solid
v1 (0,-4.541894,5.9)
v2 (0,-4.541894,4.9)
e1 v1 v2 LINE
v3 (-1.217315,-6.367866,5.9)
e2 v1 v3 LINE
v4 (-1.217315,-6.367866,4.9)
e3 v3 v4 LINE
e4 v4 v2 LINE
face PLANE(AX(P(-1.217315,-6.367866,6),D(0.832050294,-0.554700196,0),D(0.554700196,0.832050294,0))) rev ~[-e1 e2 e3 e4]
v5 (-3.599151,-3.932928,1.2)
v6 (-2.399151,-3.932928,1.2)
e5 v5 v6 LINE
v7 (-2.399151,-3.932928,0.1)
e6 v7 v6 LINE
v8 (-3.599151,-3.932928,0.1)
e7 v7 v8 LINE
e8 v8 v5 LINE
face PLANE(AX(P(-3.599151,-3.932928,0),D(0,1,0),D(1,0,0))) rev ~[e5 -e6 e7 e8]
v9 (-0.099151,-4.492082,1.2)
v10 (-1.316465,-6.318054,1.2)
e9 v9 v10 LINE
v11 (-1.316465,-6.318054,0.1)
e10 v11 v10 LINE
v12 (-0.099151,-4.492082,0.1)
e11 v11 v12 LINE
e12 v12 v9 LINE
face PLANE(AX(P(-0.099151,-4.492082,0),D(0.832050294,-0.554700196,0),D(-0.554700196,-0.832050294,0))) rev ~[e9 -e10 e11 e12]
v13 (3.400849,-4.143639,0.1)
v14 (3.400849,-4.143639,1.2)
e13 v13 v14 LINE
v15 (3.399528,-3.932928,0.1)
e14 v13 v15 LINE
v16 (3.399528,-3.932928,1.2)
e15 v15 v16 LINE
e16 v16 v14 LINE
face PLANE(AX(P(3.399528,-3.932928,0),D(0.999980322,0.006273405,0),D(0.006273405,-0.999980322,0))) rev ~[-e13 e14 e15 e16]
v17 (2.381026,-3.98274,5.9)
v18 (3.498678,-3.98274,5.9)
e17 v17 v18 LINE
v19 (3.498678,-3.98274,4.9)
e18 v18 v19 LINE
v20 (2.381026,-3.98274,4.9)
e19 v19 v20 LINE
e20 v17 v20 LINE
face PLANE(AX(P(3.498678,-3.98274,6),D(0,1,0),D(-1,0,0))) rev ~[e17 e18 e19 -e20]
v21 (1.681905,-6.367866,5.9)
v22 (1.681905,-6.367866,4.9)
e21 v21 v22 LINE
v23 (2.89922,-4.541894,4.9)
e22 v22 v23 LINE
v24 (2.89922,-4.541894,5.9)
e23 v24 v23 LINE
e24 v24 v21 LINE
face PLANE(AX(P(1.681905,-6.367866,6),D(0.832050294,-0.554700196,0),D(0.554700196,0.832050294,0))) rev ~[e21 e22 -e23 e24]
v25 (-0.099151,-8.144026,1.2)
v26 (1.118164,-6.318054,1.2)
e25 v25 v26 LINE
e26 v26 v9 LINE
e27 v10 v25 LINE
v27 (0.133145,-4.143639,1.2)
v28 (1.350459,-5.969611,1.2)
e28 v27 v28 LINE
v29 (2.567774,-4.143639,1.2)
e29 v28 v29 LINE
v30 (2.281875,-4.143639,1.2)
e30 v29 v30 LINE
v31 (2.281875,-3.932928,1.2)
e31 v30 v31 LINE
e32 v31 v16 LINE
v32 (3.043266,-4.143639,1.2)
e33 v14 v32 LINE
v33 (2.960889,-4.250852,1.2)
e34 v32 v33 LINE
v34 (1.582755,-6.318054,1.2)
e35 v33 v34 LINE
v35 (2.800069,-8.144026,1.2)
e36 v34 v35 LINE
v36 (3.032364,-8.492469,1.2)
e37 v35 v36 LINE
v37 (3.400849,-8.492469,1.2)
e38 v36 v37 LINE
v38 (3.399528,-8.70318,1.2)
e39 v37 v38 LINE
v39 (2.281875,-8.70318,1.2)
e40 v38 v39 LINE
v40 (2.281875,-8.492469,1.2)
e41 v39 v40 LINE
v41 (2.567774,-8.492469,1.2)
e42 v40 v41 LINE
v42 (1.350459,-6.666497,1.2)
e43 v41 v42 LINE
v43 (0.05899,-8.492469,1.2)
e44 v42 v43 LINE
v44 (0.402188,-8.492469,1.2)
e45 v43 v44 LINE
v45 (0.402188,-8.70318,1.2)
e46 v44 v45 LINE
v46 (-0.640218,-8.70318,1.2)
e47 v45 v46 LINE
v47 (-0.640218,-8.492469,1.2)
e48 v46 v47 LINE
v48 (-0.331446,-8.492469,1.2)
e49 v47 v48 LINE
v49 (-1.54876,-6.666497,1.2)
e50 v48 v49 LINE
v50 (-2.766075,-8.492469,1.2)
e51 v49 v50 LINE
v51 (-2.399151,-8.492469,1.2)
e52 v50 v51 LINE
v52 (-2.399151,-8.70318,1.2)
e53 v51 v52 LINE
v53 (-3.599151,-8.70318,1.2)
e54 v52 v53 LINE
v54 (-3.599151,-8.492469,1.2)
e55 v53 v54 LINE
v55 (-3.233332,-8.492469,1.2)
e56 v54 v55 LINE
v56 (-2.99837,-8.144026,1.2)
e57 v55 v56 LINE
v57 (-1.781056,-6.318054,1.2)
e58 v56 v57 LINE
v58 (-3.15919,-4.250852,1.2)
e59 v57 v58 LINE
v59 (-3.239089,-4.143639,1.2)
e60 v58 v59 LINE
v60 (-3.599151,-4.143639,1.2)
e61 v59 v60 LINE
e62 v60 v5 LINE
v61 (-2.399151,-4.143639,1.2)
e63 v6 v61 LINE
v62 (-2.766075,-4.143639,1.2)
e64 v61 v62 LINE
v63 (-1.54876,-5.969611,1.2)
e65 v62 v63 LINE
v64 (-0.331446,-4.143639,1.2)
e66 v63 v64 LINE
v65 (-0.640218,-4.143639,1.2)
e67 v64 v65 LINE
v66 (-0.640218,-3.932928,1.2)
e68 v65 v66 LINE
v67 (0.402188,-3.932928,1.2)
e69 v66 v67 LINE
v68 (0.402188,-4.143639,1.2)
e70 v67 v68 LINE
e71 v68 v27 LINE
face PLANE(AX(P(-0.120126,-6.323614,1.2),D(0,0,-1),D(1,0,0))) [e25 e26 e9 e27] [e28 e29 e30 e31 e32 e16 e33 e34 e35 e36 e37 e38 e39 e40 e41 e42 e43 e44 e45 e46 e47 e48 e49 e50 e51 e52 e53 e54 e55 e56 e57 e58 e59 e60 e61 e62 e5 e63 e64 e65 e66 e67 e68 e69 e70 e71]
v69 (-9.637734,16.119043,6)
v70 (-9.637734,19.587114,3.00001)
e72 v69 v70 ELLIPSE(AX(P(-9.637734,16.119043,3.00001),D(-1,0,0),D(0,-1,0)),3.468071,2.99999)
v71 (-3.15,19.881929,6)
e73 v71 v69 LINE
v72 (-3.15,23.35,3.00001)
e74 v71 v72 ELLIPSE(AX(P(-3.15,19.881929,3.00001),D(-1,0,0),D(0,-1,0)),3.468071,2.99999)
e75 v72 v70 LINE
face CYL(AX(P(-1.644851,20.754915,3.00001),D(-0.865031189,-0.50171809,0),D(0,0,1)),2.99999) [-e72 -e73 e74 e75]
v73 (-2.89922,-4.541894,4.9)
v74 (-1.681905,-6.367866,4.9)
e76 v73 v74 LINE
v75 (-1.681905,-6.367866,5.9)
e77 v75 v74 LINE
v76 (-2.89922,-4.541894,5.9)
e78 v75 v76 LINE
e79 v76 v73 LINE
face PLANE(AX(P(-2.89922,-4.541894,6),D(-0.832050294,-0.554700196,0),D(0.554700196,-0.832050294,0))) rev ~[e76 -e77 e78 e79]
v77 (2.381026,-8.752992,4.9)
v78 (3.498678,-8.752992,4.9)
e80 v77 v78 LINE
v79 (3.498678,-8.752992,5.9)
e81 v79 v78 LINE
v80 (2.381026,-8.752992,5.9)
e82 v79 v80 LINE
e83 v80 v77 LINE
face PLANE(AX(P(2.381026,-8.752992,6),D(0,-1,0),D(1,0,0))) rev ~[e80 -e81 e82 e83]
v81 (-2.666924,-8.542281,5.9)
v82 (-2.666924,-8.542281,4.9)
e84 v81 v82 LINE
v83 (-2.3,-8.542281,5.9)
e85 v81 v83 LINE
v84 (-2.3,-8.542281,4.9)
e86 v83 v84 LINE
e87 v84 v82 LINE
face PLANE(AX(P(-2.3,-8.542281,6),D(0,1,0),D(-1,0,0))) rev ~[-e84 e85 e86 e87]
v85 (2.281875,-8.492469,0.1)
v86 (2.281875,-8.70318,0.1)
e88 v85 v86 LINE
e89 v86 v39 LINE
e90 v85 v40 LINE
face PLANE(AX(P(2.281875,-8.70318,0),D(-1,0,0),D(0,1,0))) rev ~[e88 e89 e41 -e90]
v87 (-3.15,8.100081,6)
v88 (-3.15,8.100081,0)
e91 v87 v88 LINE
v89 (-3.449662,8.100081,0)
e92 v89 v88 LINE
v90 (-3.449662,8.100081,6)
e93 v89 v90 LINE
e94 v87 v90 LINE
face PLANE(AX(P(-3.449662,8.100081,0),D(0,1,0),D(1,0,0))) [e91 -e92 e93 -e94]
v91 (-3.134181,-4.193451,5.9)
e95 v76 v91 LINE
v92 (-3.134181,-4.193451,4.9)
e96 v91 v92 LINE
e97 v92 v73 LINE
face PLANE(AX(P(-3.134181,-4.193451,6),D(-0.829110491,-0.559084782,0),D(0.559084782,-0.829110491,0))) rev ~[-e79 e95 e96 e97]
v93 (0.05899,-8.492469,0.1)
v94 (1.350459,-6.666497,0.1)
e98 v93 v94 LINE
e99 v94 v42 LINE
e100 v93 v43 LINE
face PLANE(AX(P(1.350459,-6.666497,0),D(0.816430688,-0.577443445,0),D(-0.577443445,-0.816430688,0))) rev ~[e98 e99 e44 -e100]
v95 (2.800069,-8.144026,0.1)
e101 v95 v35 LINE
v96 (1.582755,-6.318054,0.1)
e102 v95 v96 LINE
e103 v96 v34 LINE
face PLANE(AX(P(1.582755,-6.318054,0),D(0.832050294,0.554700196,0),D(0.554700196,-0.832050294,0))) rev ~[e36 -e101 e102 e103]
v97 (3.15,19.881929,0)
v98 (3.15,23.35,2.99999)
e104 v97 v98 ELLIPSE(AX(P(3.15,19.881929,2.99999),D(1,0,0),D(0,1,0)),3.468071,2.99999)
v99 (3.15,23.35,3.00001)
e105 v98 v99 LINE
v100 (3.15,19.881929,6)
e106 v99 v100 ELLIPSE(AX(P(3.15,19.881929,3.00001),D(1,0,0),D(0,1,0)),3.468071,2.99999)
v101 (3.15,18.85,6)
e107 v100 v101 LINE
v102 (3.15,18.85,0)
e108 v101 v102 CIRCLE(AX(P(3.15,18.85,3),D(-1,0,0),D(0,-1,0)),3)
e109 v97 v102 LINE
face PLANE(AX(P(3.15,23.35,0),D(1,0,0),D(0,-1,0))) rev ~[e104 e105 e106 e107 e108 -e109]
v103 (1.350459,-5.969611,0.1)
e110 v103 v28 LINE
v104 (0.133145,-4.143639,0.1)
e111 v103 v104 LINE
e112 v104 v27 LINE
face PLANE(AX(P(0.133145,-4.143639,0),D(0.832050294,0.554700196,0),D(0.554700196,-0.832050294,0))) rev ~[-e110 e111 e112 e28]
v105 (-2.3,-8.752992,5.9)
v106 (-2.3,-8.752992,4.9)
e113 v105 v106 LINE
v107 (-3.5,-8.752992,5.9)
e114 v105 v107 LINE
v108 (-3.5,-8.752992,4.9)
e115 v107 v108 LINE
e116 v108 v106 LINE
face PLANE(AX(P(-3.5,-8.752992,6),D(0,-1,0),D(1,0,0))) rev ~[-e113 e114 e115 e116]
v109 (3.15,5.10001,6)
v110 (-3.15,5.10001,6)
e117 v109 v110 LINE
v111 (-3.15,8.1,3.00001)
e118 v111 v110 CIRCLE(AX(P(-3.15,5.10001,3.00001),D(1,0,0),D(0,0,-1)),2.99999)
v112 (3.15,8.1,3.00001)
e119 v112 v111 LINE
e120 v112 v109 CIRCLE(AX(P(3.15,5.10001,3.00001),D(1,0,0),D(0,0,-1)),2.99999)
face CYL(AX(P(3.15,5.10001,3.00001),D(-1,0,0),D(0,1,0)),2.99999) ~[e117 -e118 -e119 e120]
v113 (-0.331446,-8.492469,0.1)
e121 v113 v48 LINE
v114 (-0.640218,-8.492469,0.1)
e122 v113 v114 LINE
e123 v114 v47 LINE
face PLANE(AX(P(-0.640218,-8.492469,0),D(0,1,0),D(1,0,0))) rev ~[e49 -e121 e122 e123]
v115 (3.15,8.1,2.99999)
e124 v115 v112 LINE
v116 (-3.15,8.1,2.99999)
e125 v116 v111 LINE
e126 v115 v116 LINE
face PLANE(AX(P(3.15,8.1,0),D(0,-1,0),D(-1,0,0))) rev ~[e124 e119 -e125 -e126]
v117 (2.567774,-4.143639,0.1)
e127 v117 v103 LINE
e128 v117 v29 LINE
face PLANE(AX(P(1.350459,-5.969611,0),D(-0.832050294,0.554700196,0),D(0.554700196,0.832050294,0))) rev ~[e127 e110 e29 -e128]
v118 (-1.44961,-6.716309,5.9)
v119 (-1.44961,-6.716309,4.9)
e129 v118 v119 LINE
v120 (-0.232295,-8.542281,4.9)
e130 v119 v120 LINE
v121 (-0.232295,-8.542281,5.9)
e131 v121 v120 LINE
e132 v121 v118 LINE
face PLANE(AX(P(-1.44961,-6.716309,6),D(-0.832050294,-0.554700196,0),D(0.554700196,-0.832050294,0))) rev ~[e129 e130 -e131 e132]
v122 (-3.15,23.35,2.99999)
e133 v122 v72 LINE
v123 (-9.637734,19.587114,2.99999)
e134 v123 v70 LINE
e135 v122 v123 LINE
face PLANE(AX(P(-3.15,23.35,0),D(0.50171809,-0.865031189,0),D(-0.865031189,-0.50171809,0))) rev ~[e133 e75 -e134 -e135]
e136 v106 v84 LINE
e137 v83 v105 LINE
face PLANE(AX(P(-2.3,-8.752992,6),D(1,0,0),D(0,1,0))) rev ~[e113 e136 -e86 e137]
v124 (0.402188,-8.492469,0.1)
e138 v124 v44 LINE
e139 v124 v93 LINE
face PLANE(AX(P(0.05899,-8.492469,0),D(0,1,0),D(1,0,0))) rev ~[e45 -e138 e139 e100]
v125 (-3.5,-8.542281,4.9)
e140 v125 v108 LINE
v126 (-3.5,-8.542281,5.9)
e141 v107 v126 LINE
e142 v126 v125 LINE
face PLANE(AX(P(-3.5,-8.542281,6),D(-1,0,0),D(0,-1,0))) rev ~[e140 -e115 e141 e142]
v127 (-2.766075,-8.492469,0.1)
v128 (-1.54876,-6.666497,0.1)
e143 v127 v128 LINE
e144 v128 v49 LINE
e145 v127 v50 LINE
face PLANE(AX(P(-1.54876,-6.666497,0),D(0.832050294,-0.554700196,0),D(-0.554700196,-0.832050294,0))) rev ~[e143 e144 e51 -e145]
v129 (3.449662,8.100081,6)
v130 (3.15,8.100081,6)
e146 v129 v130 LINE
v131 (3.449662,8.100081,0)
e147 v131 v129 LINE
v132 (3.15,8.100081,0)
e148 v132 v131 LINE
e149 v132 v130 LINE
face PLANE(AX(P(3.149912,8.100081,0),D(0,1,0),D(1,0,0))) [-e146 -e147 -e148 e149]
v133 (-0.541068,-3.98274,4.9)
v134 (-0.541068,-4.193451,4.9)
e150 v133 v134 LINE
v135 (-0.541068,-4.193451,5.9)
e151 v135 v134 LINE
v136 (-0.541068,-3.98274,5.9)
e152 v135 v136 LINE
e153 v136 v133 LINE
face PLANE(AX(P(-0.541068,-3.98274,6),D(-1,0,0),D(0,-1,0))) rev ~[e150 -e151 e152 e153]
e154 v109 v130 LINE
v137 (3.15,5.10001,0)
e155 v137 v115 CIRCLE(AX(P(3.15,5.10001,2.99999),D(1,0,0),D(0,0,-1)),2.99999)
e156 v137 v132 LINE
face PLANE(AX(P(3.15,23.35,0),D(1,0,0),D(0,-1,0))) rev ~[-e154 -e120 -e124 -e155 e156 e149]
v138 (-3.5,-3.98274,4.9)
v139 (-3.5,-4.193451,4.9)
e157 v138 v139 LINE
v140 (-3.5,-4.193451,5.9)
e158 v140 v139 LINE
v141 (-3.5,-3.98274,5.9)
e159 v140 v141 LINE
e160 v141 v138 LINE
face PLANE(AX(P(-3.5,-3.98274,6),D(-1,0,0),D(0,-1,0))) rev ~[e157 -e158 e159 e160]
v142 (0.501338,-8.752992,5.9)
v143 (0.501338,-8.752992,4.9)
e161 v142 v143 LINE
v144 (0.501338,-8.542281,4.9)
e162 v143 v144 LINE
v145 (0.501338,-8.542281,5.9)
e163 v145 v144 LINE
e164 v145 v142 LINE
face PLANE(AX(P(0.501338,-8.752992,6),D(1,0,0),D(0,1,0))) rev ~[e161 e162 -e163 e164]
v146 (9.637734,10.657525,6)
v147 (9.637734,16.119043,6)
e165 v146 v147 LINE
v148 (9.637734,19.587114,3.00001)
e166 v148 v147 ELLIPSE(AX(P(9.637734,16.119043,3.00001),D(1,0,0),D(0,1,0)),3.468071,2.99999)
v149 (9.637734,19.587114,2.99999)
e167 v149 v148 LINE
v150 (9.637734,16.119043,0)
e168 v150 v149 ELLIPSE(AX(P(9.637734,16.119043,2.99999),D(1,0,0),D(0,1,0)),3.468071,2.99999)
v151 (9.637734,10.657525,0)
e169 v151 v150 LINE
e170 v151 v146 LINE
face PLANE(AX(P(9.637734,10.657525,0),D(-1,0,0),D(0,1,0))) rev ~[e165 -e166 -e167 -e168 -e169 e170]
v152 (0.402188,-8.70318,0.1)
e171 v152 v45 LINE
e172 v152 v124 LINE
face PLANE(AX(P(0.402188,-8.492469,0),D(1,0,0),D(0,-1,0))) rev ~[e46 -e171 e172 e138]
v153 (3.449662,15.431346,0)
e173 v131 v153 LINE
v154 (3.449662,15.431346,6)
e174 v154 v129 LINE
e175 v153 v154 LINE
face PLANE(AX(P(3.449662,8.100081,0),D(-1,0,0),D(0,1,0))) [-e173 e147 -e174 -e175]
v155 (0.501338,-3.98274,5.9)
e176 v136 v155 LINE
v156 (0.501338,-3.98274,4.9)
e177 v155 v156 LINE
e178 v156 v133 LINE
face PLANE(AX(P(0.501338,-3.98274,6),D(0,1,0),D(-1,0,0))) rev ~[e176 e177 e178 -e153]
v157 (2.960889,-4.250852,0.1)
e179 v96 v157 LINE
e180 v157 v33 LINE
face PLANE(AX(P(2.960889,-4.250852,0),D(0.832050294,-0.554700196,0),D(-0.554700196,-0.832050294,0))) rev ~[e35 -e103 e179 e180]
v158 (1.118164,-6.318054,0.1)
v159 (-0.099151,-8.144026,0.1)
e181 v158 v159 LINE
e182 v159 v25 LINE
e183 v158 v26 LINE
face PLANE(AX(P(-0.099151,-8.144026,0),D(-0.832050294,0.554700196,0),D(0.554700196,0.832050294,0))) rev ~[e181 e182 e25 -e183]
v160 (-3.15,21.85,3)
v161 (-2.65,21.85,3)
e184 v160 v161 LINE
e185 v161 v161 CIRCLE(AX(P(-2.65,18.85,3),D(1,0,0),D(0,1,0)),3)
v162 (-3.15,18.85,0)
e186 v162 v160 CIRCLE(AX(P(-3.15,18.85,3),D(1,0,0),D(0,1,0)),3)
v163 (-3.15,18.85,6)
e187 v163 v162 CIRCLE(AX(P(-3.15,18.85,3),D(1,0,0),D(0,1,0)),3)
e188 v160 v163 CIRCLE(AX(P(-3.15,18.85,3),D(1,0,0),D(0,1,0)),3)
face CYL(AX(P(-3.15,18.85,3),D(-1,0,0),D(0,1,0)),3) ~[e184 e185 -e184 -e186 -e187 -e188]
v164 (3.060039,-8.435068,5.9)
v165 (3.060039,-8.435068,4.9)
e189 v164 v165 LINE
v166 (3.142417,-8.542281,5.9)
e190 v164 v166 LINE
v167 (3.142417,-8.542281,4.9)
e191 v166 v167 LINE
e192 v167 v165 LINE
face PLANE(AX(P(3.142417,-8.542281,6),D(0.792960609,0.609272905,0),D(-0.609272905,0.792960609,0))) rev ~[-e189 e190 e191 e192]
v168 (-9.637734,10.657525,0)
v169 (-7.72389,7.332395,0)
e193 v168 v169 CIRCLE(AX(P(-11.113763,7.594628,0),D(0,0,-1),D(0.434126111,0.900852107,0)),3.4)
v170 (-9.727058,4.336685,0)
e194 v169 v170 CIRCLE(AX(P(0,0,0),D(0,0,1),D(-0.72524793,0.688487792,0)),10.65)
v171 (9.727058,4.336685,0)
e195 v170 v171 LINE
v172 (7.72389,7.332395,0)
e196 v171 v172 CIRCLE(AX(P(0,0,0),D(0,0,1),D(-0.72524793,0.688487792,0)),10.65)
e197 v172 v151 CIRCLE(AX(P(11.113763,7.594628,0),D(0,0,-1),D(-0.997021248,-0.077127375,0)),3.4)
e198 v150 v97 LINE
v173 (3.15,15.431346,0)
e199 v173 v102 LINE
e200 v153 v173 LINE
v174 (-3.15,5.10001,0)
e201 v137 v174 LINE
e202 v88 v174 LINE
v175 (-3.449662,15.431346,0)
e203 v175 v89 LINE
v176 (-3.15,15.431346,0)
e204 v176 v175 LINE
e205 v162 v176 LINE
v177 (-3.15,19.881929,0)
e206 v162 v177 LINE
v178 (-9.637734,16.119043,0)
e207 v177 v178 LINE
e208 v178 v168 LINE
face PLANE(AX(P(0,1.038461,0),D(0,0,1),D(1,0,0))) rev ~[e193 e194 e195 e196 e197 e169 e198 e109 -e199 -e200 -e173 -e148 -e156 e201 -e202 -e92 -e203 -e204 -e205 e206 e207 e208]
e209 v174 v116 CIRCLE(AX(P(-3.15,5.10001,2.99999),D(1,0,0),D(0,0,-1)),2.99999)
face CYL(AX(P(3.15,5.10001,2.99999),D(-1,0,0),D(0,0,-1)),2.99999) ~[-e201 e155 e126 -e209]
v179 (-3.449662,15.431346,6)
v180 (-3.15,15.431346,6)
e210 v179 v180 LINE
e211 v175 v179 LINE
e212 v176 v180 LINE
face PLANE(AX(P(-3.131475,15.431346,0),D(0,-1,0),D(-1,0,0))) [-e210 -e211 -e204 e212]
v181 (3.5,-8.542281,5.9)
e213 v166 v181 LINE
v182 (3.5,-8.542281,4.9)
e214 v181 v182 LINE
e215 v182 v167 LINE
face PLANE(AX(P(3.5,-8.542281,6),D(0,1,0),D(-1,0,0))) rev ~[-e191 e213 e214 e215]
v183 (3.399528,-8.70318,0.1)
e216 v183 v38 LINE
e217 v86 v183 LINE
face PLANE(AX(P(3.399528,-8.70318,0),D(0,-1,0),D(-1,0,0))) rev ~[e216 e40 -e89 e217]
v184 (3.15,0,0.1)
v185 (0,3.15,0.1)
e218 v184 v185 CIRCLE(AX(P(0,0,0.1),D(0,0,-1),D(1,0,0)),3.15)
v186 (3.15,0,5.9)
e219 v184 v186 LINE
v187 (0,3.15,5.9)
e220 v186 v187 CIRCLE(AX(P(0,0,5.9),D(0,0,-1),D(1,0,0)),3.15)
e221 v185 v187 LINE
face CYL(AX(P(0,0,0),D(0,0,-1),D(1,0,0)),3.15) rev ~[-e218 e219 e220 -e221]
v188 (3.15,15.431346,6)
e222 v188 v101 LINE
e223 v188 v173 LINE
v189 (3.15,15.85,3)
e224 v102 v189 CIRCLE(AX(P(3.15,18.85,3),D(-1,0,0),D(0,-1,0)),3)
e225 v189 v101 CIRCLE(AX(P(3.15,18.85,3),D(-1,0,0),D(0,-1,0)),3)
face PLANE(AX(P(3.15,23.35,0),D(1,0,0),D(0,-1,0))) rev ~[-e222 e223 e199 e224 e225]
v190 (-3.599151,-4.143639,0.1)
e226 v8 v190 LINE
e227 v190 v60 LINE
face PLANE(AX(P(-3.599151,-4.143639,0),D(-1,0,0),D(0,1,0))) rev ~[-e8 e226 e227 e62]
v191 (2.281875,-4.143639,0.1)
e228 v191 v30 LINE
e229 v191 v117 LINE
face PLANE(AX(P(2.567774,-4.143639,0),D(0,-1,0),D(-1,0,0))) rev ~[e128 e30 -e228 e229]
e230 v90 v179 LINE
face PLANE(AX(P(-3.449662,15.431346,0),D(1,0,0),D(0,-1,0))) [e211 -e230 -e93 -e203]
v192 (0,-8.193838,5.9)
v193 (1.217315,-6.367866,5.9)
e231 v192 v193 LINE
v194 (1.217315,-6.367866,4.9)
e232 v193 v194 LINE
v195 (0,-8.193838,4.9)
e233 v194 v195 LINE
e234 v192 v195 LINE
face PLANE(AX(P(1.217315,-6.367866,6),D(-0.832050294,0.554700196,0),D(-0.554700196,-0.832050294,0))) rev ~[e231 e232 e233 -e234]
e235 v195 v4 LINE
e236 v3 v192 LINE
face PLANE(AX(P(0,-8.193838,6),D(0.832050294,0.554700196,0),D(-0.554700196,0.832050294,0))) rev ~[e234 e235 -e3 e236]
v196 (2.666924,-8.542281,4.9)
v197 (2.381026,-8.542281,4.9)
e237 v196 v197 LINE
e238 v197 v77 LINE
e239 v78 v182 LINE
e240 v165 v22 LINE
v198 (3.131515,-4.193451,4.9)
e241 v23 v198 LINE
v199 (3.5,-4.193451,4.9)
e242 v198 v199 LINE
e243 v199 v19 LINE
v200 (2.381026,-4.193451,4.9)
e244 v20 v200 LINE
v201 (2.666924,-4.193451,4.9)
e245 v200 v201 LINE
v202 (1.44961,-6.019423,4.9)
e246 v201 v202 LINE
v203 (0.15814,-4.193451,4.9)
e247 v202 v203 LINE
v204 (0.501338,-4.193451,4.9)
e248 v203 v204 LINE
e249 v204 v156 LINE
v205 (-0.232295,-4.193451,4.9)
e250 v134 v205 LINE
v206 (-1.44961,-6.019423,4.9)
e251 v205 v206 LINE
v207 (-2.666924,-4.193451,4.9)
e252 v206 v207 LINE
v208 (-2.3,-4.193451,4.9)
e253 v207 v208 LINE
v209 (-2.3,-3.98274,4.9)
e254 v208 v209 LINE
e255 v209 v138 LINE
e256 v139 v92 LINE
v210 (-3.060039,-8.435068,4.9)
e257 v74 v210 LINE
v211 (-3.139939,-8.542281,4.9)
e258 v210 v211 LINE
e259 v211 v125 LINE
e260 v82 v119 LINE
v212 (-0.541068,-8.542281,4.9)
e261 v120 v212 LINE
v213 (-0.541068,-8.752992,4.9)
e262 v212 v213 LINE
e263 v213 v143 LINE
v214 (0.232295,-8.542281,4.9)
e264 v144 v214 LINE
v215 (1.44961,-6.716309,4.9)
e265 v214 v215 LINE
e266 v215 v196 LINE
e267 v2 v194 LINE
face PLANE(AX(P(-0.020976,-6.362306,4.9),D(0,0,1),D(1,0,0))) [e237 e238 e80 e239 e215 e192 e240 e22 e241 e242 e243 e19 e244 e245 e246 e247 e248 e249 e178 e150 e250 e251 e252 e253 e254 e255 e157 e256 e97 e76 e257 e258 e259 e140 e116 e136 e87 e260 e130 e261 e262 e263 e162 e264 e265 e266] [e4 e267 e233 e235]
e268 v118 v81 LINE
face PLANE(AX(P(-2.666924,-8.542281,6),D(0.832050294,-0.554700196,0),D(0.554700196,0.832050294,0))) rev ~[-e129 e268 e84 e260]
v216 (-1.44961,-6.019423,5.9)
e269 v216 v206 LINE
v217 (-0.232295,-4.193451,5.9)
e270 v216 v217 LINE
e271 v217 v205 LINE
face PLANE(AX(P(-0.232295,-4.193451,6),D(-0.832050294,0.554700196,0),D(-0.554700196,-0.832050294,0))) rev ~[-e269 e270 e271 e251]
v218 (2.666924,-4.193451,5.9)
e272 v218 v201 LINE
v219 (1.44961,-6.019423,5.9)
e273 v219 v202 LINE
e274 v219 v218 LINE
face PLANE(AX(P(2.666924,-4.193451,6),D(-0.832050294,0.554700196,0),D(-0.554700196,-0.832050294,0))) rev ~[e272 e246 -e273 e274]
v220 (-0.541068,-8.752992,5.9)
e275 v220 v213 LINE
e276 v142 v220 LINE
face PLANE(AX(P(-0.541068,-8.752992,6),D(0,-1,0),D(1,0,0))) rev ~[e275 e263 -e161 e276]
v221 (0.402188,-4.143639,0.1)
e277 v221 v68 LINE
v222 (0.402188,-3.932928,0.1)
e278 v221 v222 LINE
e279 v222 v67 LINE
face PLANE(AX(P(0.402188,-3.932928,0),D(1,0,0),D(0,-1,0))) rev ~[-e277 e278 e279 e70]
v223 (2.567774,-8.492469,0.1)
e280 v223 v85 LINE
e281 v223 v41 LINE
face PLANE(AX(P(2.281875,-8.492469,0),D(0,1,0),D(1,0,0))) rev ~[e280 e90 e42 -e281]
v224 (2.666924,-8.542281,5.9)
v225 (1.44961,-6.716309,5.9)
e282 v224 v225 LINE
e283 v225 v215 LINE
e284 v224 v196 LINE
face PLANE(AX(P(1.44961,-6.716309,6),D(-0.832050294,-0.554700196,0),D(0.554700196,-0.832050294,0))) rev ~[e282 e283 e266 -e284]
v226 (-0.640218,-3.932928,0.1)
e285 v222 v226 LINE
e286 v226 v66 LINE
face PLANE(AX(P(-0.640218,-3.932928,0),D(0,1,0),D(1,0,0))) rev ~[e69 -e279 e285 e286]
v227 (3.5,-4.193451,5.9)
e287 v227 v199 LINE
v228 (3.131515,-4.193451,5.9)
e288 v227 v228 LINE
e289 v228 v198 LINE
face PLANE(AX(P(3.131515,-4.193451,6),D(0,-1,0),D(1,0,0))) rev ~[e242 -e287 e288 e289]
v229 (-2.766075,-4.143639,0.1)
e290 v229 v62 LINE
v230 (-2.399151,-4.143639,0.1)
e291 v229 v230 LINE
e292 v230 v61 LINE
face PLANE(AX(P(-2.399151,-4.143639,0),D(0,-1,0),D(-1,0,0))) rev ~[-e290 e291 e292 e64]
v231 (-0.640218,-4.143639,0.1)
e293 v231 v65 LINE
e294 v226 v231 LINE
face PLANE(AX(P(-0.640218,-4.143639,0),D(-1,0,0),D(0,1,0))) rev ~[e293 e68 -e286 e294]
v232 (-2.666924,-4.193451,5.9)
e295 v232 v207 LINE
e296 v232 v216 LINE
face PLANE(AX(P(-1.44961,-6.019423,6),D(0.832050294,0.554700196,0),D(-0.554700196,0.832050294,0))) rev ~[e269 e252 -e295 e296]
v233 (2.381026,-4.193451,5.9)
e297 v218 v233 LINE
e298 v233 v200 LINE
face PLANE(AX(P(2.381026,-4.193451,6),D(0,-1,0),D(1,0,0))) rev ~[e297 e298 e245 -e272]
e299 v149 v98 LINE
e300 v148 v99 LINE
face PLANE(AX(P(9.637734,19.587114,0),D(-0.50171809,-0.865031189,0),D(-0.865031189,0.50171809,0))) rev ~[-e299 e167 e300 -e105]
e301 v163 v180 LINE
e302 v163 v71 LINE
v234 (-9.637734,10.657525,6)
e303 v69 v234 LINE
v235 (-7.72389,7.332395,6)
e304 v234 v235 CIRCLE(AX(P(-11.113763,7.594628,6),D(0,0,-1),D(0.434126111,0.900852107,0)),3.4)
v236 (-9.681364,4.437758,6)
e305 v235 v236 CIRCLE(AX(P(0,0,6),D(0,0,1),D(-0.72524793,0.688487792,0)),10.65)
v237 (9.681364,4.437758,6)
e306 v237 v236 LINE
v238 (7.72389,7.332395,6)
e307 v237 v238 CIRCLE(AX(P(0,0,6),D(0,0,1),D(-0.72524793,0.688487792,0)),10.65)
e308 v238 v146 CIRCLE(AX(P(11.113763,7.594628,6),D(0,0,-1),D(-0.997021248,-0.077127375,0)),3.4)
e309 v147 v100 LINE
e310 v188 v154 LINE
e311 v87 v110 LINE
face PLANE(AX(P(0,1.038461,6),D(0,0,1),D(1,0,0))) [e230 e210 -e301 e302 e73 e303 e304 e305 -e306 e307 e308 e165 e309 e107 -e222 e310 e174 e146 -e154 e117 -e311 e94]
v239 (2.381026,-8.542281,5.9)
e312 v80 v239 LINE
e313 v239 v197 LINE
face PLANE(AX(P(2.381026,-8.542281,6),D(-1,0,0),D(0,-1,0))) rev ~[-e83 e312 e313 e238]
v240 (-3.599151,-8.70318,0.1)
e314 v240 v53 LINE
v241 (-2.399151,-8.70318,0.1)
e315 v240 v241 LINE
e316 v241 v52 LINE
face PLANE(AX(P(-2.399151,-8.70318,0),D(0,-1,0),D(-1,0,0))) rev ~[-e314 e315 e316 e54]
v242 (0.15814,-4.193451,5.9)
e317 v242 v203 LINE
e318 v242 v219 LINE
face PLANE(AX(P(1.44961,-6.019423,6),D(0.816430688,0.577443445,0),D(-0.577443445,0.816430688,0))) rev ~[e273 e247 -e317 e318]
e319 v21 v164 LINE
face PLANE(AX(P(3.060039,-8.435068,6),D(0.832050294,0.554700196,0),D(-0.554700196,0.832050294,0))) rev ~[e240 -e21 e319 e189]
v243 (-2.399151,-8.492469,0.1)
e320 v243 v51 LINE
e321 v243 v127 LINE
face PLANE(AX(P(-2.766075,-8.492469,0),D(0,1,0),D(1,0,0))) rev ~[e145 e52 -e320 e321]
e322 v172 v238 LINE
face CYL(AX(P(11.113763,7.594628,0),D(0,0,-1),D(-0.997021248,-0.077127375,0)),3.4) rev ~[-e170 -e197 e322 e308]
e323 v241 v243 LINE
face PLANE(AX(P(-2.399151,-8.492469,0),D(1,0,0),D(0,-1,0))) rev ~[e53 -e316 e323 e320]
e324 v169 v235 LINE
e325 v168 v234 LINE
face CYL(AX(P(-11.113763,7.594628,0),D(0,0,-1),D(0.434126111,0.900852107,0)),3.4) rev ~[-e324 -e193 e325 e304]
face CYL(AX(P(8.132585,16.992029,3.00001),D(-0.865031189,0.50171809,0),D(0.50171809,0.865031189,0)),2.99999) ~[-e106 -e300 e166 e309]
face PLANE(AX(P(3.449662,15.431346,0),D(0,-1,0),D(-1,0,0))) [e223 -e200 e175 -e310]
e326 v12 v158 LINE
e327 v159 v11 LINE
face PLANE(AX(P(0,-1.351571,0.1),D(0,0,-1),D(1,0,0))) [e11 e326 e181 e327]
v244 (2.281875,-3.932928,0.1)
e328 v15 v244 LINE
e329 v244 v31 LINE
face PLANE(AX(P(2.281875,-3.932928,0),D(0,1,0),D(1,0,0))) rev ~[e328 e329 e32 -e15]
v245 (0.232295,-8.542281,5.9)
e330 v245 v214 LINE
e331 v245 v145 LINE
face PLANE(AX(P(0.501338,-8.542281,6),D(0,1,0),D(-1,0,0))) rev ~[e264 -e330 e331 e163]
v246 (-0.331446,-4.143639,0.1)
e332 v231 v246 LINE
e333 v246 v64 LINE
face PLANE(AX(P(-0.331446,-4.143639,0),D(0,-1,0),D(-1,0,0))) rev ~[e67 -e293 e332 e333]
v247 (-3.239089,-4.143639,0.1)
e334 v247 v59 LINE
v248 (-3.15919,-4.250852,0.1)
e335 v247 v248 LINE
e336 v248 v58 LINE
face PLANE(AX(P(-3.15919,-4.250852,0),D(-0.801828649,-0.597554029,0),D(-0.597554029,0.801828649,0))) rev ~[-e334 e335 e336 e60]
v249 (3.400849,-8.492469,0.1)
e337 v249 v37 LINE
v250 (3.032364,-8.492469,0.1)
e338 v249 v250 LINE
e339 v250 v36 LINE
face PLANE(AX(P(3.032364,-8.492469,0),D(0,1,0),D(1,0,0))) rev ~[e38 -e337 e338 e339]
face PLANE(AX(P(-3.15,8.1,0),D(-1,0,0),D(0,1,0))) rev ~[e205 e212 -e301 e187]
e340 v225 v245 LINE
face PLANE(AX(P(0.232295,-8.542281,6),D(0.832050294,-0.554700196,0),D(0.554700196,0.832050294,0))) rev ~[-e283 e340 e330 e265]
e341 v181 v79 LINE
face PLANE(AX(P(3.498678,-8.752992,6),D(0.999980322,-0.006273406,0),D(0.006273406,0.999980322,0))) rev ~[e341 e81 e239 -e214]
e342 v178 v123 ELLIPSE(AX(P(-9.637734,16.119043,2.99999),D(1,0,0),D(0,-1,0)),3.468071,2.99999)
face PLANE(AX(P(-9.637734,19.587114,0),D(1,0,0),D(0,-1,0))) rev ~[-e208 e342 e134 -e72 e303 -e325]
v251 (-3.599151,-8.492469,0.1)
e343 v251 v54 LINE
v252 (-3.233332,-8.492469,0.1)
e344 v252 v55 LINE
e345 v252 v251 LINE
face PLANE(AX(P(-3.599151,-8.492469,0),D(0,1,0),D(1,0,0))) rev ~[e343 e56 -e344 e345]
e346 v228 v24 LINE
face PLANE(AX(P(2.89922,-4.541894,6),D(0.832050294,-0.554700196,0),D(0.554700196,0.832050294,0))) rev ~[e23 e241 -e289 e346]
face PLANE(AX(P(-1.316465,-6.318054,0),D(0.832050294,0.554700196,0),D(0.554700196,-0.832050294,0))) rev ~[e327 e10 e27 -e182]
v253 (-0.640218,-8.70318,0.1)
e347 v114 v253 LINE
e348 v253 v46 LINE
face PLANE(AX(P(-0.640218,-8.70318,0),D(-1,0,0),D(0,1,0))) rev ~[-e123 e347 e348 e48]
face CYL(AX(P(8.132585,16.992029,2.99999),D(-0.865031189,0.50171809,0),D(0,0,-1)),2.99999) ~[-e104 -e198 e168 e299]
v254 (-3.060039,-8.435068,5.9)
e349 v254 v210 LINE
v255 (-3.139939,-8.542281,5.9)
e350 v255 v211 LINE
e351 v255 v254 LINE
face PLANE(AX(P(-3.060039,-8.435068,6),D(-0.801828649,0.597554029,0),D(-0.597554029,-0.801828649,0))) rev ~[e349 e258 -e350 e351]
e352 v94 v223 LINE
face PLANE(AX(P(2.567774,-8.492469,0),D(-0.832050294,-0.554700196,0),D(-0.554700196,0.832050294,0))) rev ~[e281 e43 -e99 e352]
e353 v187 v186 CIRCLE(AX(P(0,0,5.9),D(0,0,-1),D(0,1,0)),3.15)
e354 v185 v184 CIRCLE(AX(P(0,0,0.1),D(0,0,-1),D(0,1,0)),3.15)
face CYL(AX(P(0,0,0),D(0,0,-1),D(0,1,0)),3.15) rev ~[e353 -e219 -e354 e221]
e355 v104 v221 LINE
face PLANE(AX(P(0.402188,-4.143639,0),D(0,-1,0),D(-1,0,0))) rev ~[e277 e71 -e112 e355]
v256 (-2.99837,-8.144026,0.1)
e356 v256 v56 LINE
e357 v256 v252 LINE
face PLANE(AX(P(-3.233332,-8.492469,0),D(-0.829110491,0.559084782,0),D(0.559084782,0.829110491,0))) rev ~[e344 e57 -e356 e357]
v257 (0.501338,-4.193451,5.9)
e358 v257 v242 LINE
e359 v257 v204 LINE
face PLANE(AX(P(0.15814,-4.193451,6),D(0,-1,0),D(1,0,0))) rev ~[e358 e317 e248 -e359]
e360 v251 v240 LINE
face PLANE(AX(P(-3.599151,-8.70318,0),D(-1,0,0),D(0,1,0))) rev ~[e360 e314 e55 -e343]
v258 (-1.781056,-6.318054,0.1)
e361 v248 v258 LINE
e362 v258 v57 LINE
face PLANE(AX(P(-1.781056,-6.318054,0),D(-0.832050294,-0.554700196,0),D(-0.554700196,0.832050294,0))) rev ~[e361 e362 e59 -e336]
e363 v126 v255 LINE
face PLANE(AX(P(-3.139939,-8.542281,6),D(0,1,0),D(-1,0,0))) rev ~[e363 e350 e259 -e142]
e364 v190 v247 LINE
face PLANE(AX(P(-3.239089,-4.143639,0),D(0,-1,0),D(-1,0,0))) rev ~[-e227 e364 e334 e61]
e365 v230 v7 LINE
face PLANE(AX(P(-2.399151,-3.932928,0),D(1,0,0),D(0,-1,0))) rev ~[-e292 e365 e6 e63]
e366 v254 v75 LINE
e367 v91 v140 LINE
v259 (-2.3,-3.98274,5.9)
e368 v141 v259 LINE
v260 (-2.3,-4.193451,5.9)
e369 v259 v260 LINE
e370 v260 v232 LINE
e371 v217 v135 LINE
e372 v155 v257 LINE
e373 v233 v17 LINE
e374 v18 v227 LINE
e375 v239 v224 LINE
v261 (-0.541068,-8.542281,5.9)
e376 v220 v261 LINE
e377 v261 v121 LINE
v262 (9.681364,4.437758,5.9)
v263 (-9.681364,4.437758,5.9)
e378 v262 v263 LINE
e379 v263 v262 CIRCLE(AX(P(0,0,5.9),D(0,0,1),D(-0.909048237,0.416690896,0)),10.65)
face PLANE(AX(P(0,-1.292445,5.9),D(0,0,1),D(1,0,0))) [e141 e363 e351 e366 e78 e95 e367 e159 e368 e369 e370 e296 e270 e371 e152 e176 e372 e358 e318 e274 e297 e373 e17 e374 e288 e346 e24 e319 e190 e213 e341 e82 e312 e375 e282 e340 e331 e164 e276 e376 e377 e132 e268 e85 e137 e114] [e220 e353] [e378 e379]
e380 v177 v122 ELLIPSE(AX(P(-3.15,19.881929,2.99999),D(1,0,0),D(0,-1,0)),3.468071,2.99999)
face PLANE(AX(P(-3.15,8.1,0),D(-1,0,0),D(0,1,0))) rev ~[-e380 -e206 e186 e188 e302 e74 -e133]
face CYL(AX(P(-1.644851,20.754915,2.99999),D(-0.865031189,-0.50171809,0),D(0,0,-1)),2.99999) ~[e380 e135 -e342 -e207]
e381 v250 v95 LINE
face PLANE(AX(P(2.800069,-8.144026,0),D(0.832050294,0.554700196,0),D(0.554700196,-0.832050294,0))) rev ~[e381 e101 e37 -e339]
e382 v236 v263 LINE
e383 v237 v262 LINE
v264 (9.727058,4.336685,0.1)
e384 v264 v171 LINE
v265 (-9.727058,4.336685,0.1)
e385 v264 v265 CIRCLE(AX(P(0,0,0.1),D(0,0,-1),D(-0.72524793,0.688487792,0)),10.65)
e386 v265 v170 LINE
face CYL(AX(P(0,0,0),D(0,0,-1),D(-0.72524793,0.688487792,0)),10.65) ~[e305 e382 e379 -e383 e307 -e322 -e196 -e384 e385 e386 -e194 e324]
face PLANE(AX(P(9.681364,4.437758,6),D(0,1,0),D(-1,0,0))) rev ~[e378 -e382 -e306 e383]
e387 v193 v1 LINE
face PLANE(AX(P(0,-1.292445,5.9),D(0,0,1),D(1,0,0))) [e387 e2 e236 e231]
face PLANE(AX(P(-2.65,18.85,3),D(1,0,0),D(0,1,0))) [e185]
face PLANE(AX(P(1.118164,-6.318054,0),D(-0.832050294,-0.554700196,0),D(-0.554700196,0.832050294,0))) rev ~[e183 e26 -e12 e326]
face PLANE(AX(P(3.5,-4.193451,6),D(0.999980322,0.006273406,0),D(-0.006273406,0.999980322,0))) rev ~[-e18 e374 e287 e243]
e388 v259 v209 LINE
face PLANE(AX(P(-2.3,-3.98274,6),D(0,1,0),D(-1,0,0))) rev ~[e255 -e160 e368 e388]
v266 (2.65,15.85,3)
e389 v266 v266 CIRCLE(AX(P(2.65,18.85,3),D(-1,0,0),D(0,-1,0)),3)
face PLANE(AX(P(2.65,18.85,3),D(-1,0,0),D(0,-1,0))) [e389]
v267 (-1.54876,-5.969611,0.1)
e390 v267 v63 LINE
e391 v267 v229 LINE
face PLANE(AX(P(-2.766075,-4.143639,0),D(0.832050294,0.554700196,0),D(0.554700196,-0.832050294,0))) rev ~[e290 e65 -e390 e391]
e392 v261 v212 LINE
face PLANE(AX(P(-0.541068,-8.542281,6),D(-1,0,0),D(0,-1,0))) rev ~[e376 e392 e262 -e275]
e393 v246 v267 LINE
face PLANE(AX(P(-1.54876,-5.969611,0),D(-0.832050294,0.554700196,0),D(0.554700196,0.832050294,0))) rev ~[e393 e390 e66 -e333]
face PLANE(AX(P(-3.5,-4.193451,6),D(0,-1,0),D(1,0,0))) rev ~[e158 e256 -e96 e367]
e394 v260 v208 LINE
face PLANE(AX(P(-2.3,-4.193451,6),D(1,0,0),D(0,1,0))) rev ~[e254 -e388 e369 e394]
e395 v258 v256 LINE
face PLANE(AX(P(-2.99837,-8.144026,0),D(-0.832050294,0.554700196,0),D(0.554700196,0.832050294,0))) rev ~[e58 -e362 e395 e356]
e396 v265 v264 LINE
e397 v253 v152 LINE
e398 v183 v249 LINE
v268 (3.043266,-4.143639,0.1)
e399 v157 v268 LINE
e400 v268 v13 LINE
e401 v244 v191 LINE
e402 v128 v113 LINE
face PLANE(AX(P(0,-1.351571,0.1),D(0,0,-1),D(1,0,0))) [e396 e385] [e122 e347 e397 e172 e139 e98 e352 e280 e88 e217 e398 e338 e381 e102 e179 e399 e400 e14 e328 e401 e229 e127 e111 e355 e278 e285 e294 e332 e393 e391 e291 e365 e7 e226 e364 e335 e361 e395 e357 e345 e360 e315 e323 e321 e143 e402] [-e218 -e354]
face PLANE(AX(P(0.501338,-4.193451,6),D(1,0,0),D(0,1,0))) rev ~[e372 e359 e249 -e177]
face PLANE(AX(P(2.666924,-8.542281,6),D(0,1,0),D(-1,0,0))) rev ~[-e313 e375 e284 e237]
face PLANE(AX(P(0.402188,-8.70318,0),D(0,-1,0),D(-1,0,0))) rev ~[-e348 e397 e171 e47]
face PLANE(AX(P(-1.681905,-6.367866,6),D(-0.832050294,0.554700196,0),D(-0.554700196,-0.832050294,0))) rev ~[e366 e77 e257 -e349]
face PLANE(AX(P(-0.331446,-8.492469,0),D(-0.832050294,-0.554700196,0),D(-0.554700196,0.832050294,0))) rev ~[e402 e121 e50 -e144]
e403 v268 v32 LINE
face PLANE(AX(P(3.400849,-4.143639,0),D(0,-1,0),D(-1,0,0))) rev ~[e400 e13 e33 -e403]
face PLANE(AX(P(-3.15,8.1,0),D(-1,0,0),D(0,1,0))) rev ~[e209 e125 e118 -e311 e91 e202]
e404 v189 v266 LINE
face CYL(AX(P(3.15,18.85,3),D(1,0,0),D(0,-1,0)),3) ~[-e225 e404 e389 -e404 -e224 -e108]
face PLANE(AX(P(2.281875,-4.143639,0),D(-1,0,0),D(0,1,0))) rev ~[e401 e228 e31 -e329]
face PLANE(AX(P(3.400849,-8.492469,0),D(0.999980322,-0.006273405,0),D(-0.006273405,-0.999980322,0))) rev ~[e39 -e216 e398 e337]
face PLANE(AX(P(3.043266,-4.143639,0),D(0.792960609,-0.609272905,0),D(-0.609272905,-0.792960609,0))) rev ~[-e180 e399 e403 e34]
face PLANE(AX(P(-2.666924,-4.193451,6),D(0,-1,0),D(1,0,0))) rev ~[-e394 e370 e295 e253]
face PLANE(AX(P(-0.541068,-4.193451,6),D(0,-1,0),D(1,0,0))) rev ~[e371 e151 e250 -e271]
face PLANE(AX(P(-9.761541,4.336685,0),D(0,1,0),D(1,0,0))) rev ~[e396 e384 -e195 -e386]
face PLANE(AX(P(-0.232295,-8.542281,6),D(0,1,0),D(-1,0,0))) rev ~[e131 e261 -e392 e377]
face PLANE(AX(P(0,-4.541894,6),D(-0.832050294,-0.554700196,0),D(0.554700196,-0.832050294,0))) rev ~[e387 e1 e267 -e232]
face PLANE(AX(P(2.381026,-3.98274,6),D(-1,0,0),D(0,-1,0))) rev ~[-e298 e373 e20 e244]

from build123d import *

# Parameters (mm, degrees)
F1_DEPTH  = 6
F2_R      = 3
F3_DEPTH  = 0.5
F4_R      = 3
F5_DEPTH  = 0.5
F6_R      = 2.99999
F7_R      = 2.99999
F9_DEPTH  = 1.1
F11_DEPTH = 1.2
F12_R     = 2.99999
F14_DEPTH = 13.4
F16_DEPTH = 0.1
F18_DEPTH = 0.1


# Not quite as in the source:
# - a fillet or chamfer is up to 0.001 mm smaller than in the source, because OpenCascade refuses the exact size


with BuildPart() as f1:
    # F0 (on Top) → F1 (new body)
    with BuildSketch(Plane.XY):
        with BuildLine():
            Line((-3.15, 8.1), (-3.15, 10.1734949747))
            ThreePointArc((-3.15, 10.1734949747), (-5.6194604457, 9.046776459), (-7.7238904562, 7.3323949854))
            ThreePointArc((-7.7238904562, 7.3323949854), (0, -10.65), (7.7238904562, 7.3323949854))
            ThreePointArc((7.7238904562, 7.3323949854), (5.6194604457, 9.046776459), (3.15, 10.1734949747))
            Line((3.15, 10.1734949747), (3.15, 8.1))
            Line((3.15, 8.1), (0, 8.1))
            Line((0, 8.1), (-3.15, 8.1))
        make_face()
        with BuildLine():
            ThreePointArc((3.15, 0), (-2.2273863607, -2.2273863607), (0, 3.15))
            ThreePointArc((0, 3.15), (2.2273863607, 2.2273863607), (3.15, 0))
        make_face(mode=Mode.SUBTRACT)
        with BuildLine():
            ThreePointArc((-7.7238904562, 7.3323949854), (-5.6194604457, 9.046776459), (-3.15, 10.1734949747))
            Line((-3.15, 10.1734949747), (-3.15, 23.35))
            Line((-3.15, 23.35), (-9.6377339195, 19.5871143267))
            Line((-9.6377339195, 19.5871143267), (-9.6377339195, 10.6575252249))
            ThreePointArc((-9.6377339195, 10.6575252249), (-8.1670066914, 9.2906908645), (-7.7238904562, 7.3323949854))
        make_face()
        with BuildLine():
            ThreePointArc((3.15, 10.1734949747), (5.6194604457, 9.046776459), (7.7238904562, 7.3323949854))
            ThreePointArc((7.7238904562, 7.3323949854), (8.1670066914, 9.2906908645), (9.6377339195, 10.6575252249))
            Line((9.6377339195, 10.6575252249), (9.6377339195, 19.5871143267))
            Line((9.6377339195, 19.5871143267), (3.15, 23.35))
            Line((3.15, 23.35), (3.15, 10.1734949747))
        make_face()
    extrude(amount=F1_DEPTH)

    # F2 (on face) → F3 (join)
    with BuildSketch(Plane.YZ.offset(-3.15)):
        with Locations((18.85, 3)):
            Circle(F2_R)
    extrude(amount=F3_DEPTH)

    # F4 (on face) → F5 (join)
    with BuildSketch(Plane(origin=(3.15, 0, 0), x_dir=(0, -1, 0), z_dir=(-1, 0, 0))):
        with Locations((-18.85, 3)):
            Circle(F4_R)
    extrude(amount=F5_DEPTH)

    # F6 (radius 3 in the source; OpenCascade refuses exactly that, so slightly less here)
    f6_edges = [f1.edges().sort_by_distance(p)[0] for p in [
        (-6.393867, 21.468557, 0),
        (-6.393867, 21.468557, 6),
    ]]
    fillet(f6_edges, radius=F6_R)

    # F7 (radius 3 in the source; OpenCascade refuses exactly that, so slightly less here)
    f7_edges = [f1.edges().sort_by_distance(p)[0] for p in [
        (6.393867, 21.468557, 0),
        (6.393867, 21.468557, 6),
    ]]
    fillet(f7_edges, radius=F7_R)

    # F8 (on face) → F9 (cut)
    with BuildSketch(Plane.XY.offset(6)):
        Polygon((-0.5410675658, -4.1934514275), (-0.2322952287, -4.1934514275), (-1.4496098506, -6.0194233604), (-2.6669244725, -4.1934514275), (-2.3, -4.1934514275), (-2.3, -3.9827399887), (-3.5, -3.9827399887), (-3.5, -4.1934514275), (-3.1341812573, -4.1934514275), (-2.8992197012, -4.5418942706), (-1.6819050793, -6.3678662034), (-3.0600394749, -8.4350677969), (-3.1399389263, -8.5422809794), (-3.5, -8.5422809794), (-3.5, -8.7529924182), (-2.3, -8.7529924182), (-2.3, -8.5422809794), (-2.6669244725, -8.5422809794), (-1.4496098506, -6.7163090465), (-0.2322952287, -8.5422809794), (-0.5410675658, -8.5422809794), (-0.5410675658, -8.7529924182), (0.5013382179, -8.7529924182), (0.5013382179, -8.5422809794), (0.2322952287, -8.5422809794), (1.4496098506, -6.7163090465), (2.6669244725, -8.5422809794), (2.3810260464, -8.5422809794), (2.3810260464, -8.7529924182), (3.4986780956, -8.7529924182), (3.5, -8.5422809794), (3.1424169429, -8.5422809794), (3.0600394749, -8.4350677969), (1.6819050793, -6.3678662034), (2.8992197012, -4.5418942706), (3.1315149299, -4.1934514275), (3.3579636365, -4.1934514275), (3.5, -4.1934514275), (3.4986780956, -3.9827399887), (2.3810260464, -3.9827399887), (2.3810260464, -4.1934514275), (2.6669244725, -4.1934514275), (1.4496098506, -6.0194233604), (0.1581401168, -4.1934514275), (0.5013382179, -4.1934514275), (0.5013382179, -3.9827399887), (-0.5410675658, -3.9827399887), align=None)
        Polygon((-1.2173146219, -6.3678662034), (0, -4.5418942706), (1.2173146219, -6.3678662034), (0, -8.1938381363), align=None, mode=Mode.SUBTRACT)
    extrude(amount=-F9_DEPTH, mode=Mode.SUBTRACT)

    # F10 (on face) → F11 (cut)
    with BuildSketch(Plane(origin=(0, 0, 0), x_dir=(1, 0, 0), z_dir=(0, 0, -1))):
        Polygon((-0.6402181378, 8.4924687258), (-0.3314458007, 8.4924687258), (-1.5487604226, 6.6664967929), (-2.7660750445, 8.4924687258), (-2.399150572, 8.4924687258), (-2.399150572, 8.7031801646), (-3.599150572, 8.7031801646), (-3.599150572, 8.4924687258), (-3.2333318293, 8.4924687258), (-2.9983702732, 8.1440258827), (-1.7810556513, 6.3180539499), (-3.1591900469, 4.2508523564), (-3.2390894983, 4.1436391739), (-3.599150572, 4.1436391739), (-3.599150572, 3.9329277351), (-2.399150572, 3.9329277351), (-2.399150572, 4.1436391739), (-2.7660750445, 4.1436391739), (-1.5487604226, 5.9696111068), (-0.3314458007, 4.1436391739), (-0.6402181378, 4.1436391739), (-0.6402181378, 3.9329277351), (0.4021876459, 3.9329277351), (0.4021876459, 4.1436391739), (0.1331446567, 4.1436391739), (1.3504592786, 5.9696111068), (2.5677739006, 4.1436391739), (2.2818754744, 4.1436391739), (2.2818754744, 3.9329277351), (3.3995275237, 3.9329277351), (3.400849428, 4.1436391739), (3.0432663709, 4.1436391739), (2.960888903, 4.2508523564), (1.5827545073, 6.3180539499), (2.8000691293, 8.1440258827), (3.032364358, 8.4924687258), (3.2588130645, 8.4924687258), (3.400849428, 8.4924687258), (3.3995275237, 8.7031801646), (2.2818754744, 8.7031801646), (2.2818754744, 8.4924687258), (2.5677739006, 8.4924687258), (1.3504592786, 6.6664967929), (0.0589895449, 8.4924687258), (0.4021876459, 8.4924687258), (0.4021876459, 8.7031801646), (-0.6402181378, 8.7031801646), align=None)
        Polygon((-1.3164651939, 6.3180539499), (-0.099150572, 8.1440258827), (1.1181640499, 6.3180539499), (-0.099150572, 4.492082017), align=None, mode=Mode.SUBTRACT)
    extrude(amount=-F11_DEPTH, mode=Mode.SUBTRACT)

    # F12 (radius 3 in the source; OpenCascade refuses exactly that, so slightly less here)
    f12_edges = [f1.edges().sort_by_distance(p)[0] for p in [
        (0, 8.1, 0),
        (0, 8.1, 6),
    ]]
    fillet(f12_edges, radius=F12_R)

    # F13 (on Top) → F14 (cut)
    with BuildSketch(Plane.XY):
        Polygon((-3.4496616572, 8.1000812352), (-3.1200703233, 8.1000812352), (-3.1314746011, 15.4313463718), (-3.4496616572, 15.4313463718), align=None)
        Polygon((3.1499122269, 8.1000812352), (3.4496616572, 8.1000812352), (3.4496616572, 15.4313463718), (3.1314746011, 15.4313463718), align=None)
    extrude(amount=F14_DEPTH, mode=Mode.SUBTRACT)

    # F15 (on face) → F16 (cut)
    with BuildSketch(Plane(origin=(0, 0, 0), x_dir=(1, 0, 0), z_dir=(0, 0, -1))):
        with BuildLine():
            Line((9.7270584918, -4.3366845744), (9.7615409984, -4.3366845744))
            ThreePointArc((9.7615409984, -4.3366845744), (0, 10.6815034411), (-9.7615409984, -4.3366845744))
            Line((-9.7615409984, -4.3366845744), (-9.7270584918, -4.3366845744))
            Line((-9.7270584918, -4.3366845744), (9.7270584918, -4.3366845744))
        make_face()
    extrude(amount=-F16_DEPTH, mode=Mode.SUBTRACT)

    # F17 (on face) → F18 (cut)
    with BuildSketch(Plane.XY.offset(6)):
        with BuildLine():
            Line((9.646881219, 4.4377580388), (-9.6813637257, 4.4377580388))
            ThreePointArc((-9.6813637257, 4.4377580388), (0, -10.65), (9.6813637257, 4.4377580388))
            Line((9.6813637257, 4.4377580388), (9.646881219, 4.4377580388))
        make_face()
    extrude(amount=-F18_DEPTH, mode=Mode.SUBTRACT)


solid = f1.part
